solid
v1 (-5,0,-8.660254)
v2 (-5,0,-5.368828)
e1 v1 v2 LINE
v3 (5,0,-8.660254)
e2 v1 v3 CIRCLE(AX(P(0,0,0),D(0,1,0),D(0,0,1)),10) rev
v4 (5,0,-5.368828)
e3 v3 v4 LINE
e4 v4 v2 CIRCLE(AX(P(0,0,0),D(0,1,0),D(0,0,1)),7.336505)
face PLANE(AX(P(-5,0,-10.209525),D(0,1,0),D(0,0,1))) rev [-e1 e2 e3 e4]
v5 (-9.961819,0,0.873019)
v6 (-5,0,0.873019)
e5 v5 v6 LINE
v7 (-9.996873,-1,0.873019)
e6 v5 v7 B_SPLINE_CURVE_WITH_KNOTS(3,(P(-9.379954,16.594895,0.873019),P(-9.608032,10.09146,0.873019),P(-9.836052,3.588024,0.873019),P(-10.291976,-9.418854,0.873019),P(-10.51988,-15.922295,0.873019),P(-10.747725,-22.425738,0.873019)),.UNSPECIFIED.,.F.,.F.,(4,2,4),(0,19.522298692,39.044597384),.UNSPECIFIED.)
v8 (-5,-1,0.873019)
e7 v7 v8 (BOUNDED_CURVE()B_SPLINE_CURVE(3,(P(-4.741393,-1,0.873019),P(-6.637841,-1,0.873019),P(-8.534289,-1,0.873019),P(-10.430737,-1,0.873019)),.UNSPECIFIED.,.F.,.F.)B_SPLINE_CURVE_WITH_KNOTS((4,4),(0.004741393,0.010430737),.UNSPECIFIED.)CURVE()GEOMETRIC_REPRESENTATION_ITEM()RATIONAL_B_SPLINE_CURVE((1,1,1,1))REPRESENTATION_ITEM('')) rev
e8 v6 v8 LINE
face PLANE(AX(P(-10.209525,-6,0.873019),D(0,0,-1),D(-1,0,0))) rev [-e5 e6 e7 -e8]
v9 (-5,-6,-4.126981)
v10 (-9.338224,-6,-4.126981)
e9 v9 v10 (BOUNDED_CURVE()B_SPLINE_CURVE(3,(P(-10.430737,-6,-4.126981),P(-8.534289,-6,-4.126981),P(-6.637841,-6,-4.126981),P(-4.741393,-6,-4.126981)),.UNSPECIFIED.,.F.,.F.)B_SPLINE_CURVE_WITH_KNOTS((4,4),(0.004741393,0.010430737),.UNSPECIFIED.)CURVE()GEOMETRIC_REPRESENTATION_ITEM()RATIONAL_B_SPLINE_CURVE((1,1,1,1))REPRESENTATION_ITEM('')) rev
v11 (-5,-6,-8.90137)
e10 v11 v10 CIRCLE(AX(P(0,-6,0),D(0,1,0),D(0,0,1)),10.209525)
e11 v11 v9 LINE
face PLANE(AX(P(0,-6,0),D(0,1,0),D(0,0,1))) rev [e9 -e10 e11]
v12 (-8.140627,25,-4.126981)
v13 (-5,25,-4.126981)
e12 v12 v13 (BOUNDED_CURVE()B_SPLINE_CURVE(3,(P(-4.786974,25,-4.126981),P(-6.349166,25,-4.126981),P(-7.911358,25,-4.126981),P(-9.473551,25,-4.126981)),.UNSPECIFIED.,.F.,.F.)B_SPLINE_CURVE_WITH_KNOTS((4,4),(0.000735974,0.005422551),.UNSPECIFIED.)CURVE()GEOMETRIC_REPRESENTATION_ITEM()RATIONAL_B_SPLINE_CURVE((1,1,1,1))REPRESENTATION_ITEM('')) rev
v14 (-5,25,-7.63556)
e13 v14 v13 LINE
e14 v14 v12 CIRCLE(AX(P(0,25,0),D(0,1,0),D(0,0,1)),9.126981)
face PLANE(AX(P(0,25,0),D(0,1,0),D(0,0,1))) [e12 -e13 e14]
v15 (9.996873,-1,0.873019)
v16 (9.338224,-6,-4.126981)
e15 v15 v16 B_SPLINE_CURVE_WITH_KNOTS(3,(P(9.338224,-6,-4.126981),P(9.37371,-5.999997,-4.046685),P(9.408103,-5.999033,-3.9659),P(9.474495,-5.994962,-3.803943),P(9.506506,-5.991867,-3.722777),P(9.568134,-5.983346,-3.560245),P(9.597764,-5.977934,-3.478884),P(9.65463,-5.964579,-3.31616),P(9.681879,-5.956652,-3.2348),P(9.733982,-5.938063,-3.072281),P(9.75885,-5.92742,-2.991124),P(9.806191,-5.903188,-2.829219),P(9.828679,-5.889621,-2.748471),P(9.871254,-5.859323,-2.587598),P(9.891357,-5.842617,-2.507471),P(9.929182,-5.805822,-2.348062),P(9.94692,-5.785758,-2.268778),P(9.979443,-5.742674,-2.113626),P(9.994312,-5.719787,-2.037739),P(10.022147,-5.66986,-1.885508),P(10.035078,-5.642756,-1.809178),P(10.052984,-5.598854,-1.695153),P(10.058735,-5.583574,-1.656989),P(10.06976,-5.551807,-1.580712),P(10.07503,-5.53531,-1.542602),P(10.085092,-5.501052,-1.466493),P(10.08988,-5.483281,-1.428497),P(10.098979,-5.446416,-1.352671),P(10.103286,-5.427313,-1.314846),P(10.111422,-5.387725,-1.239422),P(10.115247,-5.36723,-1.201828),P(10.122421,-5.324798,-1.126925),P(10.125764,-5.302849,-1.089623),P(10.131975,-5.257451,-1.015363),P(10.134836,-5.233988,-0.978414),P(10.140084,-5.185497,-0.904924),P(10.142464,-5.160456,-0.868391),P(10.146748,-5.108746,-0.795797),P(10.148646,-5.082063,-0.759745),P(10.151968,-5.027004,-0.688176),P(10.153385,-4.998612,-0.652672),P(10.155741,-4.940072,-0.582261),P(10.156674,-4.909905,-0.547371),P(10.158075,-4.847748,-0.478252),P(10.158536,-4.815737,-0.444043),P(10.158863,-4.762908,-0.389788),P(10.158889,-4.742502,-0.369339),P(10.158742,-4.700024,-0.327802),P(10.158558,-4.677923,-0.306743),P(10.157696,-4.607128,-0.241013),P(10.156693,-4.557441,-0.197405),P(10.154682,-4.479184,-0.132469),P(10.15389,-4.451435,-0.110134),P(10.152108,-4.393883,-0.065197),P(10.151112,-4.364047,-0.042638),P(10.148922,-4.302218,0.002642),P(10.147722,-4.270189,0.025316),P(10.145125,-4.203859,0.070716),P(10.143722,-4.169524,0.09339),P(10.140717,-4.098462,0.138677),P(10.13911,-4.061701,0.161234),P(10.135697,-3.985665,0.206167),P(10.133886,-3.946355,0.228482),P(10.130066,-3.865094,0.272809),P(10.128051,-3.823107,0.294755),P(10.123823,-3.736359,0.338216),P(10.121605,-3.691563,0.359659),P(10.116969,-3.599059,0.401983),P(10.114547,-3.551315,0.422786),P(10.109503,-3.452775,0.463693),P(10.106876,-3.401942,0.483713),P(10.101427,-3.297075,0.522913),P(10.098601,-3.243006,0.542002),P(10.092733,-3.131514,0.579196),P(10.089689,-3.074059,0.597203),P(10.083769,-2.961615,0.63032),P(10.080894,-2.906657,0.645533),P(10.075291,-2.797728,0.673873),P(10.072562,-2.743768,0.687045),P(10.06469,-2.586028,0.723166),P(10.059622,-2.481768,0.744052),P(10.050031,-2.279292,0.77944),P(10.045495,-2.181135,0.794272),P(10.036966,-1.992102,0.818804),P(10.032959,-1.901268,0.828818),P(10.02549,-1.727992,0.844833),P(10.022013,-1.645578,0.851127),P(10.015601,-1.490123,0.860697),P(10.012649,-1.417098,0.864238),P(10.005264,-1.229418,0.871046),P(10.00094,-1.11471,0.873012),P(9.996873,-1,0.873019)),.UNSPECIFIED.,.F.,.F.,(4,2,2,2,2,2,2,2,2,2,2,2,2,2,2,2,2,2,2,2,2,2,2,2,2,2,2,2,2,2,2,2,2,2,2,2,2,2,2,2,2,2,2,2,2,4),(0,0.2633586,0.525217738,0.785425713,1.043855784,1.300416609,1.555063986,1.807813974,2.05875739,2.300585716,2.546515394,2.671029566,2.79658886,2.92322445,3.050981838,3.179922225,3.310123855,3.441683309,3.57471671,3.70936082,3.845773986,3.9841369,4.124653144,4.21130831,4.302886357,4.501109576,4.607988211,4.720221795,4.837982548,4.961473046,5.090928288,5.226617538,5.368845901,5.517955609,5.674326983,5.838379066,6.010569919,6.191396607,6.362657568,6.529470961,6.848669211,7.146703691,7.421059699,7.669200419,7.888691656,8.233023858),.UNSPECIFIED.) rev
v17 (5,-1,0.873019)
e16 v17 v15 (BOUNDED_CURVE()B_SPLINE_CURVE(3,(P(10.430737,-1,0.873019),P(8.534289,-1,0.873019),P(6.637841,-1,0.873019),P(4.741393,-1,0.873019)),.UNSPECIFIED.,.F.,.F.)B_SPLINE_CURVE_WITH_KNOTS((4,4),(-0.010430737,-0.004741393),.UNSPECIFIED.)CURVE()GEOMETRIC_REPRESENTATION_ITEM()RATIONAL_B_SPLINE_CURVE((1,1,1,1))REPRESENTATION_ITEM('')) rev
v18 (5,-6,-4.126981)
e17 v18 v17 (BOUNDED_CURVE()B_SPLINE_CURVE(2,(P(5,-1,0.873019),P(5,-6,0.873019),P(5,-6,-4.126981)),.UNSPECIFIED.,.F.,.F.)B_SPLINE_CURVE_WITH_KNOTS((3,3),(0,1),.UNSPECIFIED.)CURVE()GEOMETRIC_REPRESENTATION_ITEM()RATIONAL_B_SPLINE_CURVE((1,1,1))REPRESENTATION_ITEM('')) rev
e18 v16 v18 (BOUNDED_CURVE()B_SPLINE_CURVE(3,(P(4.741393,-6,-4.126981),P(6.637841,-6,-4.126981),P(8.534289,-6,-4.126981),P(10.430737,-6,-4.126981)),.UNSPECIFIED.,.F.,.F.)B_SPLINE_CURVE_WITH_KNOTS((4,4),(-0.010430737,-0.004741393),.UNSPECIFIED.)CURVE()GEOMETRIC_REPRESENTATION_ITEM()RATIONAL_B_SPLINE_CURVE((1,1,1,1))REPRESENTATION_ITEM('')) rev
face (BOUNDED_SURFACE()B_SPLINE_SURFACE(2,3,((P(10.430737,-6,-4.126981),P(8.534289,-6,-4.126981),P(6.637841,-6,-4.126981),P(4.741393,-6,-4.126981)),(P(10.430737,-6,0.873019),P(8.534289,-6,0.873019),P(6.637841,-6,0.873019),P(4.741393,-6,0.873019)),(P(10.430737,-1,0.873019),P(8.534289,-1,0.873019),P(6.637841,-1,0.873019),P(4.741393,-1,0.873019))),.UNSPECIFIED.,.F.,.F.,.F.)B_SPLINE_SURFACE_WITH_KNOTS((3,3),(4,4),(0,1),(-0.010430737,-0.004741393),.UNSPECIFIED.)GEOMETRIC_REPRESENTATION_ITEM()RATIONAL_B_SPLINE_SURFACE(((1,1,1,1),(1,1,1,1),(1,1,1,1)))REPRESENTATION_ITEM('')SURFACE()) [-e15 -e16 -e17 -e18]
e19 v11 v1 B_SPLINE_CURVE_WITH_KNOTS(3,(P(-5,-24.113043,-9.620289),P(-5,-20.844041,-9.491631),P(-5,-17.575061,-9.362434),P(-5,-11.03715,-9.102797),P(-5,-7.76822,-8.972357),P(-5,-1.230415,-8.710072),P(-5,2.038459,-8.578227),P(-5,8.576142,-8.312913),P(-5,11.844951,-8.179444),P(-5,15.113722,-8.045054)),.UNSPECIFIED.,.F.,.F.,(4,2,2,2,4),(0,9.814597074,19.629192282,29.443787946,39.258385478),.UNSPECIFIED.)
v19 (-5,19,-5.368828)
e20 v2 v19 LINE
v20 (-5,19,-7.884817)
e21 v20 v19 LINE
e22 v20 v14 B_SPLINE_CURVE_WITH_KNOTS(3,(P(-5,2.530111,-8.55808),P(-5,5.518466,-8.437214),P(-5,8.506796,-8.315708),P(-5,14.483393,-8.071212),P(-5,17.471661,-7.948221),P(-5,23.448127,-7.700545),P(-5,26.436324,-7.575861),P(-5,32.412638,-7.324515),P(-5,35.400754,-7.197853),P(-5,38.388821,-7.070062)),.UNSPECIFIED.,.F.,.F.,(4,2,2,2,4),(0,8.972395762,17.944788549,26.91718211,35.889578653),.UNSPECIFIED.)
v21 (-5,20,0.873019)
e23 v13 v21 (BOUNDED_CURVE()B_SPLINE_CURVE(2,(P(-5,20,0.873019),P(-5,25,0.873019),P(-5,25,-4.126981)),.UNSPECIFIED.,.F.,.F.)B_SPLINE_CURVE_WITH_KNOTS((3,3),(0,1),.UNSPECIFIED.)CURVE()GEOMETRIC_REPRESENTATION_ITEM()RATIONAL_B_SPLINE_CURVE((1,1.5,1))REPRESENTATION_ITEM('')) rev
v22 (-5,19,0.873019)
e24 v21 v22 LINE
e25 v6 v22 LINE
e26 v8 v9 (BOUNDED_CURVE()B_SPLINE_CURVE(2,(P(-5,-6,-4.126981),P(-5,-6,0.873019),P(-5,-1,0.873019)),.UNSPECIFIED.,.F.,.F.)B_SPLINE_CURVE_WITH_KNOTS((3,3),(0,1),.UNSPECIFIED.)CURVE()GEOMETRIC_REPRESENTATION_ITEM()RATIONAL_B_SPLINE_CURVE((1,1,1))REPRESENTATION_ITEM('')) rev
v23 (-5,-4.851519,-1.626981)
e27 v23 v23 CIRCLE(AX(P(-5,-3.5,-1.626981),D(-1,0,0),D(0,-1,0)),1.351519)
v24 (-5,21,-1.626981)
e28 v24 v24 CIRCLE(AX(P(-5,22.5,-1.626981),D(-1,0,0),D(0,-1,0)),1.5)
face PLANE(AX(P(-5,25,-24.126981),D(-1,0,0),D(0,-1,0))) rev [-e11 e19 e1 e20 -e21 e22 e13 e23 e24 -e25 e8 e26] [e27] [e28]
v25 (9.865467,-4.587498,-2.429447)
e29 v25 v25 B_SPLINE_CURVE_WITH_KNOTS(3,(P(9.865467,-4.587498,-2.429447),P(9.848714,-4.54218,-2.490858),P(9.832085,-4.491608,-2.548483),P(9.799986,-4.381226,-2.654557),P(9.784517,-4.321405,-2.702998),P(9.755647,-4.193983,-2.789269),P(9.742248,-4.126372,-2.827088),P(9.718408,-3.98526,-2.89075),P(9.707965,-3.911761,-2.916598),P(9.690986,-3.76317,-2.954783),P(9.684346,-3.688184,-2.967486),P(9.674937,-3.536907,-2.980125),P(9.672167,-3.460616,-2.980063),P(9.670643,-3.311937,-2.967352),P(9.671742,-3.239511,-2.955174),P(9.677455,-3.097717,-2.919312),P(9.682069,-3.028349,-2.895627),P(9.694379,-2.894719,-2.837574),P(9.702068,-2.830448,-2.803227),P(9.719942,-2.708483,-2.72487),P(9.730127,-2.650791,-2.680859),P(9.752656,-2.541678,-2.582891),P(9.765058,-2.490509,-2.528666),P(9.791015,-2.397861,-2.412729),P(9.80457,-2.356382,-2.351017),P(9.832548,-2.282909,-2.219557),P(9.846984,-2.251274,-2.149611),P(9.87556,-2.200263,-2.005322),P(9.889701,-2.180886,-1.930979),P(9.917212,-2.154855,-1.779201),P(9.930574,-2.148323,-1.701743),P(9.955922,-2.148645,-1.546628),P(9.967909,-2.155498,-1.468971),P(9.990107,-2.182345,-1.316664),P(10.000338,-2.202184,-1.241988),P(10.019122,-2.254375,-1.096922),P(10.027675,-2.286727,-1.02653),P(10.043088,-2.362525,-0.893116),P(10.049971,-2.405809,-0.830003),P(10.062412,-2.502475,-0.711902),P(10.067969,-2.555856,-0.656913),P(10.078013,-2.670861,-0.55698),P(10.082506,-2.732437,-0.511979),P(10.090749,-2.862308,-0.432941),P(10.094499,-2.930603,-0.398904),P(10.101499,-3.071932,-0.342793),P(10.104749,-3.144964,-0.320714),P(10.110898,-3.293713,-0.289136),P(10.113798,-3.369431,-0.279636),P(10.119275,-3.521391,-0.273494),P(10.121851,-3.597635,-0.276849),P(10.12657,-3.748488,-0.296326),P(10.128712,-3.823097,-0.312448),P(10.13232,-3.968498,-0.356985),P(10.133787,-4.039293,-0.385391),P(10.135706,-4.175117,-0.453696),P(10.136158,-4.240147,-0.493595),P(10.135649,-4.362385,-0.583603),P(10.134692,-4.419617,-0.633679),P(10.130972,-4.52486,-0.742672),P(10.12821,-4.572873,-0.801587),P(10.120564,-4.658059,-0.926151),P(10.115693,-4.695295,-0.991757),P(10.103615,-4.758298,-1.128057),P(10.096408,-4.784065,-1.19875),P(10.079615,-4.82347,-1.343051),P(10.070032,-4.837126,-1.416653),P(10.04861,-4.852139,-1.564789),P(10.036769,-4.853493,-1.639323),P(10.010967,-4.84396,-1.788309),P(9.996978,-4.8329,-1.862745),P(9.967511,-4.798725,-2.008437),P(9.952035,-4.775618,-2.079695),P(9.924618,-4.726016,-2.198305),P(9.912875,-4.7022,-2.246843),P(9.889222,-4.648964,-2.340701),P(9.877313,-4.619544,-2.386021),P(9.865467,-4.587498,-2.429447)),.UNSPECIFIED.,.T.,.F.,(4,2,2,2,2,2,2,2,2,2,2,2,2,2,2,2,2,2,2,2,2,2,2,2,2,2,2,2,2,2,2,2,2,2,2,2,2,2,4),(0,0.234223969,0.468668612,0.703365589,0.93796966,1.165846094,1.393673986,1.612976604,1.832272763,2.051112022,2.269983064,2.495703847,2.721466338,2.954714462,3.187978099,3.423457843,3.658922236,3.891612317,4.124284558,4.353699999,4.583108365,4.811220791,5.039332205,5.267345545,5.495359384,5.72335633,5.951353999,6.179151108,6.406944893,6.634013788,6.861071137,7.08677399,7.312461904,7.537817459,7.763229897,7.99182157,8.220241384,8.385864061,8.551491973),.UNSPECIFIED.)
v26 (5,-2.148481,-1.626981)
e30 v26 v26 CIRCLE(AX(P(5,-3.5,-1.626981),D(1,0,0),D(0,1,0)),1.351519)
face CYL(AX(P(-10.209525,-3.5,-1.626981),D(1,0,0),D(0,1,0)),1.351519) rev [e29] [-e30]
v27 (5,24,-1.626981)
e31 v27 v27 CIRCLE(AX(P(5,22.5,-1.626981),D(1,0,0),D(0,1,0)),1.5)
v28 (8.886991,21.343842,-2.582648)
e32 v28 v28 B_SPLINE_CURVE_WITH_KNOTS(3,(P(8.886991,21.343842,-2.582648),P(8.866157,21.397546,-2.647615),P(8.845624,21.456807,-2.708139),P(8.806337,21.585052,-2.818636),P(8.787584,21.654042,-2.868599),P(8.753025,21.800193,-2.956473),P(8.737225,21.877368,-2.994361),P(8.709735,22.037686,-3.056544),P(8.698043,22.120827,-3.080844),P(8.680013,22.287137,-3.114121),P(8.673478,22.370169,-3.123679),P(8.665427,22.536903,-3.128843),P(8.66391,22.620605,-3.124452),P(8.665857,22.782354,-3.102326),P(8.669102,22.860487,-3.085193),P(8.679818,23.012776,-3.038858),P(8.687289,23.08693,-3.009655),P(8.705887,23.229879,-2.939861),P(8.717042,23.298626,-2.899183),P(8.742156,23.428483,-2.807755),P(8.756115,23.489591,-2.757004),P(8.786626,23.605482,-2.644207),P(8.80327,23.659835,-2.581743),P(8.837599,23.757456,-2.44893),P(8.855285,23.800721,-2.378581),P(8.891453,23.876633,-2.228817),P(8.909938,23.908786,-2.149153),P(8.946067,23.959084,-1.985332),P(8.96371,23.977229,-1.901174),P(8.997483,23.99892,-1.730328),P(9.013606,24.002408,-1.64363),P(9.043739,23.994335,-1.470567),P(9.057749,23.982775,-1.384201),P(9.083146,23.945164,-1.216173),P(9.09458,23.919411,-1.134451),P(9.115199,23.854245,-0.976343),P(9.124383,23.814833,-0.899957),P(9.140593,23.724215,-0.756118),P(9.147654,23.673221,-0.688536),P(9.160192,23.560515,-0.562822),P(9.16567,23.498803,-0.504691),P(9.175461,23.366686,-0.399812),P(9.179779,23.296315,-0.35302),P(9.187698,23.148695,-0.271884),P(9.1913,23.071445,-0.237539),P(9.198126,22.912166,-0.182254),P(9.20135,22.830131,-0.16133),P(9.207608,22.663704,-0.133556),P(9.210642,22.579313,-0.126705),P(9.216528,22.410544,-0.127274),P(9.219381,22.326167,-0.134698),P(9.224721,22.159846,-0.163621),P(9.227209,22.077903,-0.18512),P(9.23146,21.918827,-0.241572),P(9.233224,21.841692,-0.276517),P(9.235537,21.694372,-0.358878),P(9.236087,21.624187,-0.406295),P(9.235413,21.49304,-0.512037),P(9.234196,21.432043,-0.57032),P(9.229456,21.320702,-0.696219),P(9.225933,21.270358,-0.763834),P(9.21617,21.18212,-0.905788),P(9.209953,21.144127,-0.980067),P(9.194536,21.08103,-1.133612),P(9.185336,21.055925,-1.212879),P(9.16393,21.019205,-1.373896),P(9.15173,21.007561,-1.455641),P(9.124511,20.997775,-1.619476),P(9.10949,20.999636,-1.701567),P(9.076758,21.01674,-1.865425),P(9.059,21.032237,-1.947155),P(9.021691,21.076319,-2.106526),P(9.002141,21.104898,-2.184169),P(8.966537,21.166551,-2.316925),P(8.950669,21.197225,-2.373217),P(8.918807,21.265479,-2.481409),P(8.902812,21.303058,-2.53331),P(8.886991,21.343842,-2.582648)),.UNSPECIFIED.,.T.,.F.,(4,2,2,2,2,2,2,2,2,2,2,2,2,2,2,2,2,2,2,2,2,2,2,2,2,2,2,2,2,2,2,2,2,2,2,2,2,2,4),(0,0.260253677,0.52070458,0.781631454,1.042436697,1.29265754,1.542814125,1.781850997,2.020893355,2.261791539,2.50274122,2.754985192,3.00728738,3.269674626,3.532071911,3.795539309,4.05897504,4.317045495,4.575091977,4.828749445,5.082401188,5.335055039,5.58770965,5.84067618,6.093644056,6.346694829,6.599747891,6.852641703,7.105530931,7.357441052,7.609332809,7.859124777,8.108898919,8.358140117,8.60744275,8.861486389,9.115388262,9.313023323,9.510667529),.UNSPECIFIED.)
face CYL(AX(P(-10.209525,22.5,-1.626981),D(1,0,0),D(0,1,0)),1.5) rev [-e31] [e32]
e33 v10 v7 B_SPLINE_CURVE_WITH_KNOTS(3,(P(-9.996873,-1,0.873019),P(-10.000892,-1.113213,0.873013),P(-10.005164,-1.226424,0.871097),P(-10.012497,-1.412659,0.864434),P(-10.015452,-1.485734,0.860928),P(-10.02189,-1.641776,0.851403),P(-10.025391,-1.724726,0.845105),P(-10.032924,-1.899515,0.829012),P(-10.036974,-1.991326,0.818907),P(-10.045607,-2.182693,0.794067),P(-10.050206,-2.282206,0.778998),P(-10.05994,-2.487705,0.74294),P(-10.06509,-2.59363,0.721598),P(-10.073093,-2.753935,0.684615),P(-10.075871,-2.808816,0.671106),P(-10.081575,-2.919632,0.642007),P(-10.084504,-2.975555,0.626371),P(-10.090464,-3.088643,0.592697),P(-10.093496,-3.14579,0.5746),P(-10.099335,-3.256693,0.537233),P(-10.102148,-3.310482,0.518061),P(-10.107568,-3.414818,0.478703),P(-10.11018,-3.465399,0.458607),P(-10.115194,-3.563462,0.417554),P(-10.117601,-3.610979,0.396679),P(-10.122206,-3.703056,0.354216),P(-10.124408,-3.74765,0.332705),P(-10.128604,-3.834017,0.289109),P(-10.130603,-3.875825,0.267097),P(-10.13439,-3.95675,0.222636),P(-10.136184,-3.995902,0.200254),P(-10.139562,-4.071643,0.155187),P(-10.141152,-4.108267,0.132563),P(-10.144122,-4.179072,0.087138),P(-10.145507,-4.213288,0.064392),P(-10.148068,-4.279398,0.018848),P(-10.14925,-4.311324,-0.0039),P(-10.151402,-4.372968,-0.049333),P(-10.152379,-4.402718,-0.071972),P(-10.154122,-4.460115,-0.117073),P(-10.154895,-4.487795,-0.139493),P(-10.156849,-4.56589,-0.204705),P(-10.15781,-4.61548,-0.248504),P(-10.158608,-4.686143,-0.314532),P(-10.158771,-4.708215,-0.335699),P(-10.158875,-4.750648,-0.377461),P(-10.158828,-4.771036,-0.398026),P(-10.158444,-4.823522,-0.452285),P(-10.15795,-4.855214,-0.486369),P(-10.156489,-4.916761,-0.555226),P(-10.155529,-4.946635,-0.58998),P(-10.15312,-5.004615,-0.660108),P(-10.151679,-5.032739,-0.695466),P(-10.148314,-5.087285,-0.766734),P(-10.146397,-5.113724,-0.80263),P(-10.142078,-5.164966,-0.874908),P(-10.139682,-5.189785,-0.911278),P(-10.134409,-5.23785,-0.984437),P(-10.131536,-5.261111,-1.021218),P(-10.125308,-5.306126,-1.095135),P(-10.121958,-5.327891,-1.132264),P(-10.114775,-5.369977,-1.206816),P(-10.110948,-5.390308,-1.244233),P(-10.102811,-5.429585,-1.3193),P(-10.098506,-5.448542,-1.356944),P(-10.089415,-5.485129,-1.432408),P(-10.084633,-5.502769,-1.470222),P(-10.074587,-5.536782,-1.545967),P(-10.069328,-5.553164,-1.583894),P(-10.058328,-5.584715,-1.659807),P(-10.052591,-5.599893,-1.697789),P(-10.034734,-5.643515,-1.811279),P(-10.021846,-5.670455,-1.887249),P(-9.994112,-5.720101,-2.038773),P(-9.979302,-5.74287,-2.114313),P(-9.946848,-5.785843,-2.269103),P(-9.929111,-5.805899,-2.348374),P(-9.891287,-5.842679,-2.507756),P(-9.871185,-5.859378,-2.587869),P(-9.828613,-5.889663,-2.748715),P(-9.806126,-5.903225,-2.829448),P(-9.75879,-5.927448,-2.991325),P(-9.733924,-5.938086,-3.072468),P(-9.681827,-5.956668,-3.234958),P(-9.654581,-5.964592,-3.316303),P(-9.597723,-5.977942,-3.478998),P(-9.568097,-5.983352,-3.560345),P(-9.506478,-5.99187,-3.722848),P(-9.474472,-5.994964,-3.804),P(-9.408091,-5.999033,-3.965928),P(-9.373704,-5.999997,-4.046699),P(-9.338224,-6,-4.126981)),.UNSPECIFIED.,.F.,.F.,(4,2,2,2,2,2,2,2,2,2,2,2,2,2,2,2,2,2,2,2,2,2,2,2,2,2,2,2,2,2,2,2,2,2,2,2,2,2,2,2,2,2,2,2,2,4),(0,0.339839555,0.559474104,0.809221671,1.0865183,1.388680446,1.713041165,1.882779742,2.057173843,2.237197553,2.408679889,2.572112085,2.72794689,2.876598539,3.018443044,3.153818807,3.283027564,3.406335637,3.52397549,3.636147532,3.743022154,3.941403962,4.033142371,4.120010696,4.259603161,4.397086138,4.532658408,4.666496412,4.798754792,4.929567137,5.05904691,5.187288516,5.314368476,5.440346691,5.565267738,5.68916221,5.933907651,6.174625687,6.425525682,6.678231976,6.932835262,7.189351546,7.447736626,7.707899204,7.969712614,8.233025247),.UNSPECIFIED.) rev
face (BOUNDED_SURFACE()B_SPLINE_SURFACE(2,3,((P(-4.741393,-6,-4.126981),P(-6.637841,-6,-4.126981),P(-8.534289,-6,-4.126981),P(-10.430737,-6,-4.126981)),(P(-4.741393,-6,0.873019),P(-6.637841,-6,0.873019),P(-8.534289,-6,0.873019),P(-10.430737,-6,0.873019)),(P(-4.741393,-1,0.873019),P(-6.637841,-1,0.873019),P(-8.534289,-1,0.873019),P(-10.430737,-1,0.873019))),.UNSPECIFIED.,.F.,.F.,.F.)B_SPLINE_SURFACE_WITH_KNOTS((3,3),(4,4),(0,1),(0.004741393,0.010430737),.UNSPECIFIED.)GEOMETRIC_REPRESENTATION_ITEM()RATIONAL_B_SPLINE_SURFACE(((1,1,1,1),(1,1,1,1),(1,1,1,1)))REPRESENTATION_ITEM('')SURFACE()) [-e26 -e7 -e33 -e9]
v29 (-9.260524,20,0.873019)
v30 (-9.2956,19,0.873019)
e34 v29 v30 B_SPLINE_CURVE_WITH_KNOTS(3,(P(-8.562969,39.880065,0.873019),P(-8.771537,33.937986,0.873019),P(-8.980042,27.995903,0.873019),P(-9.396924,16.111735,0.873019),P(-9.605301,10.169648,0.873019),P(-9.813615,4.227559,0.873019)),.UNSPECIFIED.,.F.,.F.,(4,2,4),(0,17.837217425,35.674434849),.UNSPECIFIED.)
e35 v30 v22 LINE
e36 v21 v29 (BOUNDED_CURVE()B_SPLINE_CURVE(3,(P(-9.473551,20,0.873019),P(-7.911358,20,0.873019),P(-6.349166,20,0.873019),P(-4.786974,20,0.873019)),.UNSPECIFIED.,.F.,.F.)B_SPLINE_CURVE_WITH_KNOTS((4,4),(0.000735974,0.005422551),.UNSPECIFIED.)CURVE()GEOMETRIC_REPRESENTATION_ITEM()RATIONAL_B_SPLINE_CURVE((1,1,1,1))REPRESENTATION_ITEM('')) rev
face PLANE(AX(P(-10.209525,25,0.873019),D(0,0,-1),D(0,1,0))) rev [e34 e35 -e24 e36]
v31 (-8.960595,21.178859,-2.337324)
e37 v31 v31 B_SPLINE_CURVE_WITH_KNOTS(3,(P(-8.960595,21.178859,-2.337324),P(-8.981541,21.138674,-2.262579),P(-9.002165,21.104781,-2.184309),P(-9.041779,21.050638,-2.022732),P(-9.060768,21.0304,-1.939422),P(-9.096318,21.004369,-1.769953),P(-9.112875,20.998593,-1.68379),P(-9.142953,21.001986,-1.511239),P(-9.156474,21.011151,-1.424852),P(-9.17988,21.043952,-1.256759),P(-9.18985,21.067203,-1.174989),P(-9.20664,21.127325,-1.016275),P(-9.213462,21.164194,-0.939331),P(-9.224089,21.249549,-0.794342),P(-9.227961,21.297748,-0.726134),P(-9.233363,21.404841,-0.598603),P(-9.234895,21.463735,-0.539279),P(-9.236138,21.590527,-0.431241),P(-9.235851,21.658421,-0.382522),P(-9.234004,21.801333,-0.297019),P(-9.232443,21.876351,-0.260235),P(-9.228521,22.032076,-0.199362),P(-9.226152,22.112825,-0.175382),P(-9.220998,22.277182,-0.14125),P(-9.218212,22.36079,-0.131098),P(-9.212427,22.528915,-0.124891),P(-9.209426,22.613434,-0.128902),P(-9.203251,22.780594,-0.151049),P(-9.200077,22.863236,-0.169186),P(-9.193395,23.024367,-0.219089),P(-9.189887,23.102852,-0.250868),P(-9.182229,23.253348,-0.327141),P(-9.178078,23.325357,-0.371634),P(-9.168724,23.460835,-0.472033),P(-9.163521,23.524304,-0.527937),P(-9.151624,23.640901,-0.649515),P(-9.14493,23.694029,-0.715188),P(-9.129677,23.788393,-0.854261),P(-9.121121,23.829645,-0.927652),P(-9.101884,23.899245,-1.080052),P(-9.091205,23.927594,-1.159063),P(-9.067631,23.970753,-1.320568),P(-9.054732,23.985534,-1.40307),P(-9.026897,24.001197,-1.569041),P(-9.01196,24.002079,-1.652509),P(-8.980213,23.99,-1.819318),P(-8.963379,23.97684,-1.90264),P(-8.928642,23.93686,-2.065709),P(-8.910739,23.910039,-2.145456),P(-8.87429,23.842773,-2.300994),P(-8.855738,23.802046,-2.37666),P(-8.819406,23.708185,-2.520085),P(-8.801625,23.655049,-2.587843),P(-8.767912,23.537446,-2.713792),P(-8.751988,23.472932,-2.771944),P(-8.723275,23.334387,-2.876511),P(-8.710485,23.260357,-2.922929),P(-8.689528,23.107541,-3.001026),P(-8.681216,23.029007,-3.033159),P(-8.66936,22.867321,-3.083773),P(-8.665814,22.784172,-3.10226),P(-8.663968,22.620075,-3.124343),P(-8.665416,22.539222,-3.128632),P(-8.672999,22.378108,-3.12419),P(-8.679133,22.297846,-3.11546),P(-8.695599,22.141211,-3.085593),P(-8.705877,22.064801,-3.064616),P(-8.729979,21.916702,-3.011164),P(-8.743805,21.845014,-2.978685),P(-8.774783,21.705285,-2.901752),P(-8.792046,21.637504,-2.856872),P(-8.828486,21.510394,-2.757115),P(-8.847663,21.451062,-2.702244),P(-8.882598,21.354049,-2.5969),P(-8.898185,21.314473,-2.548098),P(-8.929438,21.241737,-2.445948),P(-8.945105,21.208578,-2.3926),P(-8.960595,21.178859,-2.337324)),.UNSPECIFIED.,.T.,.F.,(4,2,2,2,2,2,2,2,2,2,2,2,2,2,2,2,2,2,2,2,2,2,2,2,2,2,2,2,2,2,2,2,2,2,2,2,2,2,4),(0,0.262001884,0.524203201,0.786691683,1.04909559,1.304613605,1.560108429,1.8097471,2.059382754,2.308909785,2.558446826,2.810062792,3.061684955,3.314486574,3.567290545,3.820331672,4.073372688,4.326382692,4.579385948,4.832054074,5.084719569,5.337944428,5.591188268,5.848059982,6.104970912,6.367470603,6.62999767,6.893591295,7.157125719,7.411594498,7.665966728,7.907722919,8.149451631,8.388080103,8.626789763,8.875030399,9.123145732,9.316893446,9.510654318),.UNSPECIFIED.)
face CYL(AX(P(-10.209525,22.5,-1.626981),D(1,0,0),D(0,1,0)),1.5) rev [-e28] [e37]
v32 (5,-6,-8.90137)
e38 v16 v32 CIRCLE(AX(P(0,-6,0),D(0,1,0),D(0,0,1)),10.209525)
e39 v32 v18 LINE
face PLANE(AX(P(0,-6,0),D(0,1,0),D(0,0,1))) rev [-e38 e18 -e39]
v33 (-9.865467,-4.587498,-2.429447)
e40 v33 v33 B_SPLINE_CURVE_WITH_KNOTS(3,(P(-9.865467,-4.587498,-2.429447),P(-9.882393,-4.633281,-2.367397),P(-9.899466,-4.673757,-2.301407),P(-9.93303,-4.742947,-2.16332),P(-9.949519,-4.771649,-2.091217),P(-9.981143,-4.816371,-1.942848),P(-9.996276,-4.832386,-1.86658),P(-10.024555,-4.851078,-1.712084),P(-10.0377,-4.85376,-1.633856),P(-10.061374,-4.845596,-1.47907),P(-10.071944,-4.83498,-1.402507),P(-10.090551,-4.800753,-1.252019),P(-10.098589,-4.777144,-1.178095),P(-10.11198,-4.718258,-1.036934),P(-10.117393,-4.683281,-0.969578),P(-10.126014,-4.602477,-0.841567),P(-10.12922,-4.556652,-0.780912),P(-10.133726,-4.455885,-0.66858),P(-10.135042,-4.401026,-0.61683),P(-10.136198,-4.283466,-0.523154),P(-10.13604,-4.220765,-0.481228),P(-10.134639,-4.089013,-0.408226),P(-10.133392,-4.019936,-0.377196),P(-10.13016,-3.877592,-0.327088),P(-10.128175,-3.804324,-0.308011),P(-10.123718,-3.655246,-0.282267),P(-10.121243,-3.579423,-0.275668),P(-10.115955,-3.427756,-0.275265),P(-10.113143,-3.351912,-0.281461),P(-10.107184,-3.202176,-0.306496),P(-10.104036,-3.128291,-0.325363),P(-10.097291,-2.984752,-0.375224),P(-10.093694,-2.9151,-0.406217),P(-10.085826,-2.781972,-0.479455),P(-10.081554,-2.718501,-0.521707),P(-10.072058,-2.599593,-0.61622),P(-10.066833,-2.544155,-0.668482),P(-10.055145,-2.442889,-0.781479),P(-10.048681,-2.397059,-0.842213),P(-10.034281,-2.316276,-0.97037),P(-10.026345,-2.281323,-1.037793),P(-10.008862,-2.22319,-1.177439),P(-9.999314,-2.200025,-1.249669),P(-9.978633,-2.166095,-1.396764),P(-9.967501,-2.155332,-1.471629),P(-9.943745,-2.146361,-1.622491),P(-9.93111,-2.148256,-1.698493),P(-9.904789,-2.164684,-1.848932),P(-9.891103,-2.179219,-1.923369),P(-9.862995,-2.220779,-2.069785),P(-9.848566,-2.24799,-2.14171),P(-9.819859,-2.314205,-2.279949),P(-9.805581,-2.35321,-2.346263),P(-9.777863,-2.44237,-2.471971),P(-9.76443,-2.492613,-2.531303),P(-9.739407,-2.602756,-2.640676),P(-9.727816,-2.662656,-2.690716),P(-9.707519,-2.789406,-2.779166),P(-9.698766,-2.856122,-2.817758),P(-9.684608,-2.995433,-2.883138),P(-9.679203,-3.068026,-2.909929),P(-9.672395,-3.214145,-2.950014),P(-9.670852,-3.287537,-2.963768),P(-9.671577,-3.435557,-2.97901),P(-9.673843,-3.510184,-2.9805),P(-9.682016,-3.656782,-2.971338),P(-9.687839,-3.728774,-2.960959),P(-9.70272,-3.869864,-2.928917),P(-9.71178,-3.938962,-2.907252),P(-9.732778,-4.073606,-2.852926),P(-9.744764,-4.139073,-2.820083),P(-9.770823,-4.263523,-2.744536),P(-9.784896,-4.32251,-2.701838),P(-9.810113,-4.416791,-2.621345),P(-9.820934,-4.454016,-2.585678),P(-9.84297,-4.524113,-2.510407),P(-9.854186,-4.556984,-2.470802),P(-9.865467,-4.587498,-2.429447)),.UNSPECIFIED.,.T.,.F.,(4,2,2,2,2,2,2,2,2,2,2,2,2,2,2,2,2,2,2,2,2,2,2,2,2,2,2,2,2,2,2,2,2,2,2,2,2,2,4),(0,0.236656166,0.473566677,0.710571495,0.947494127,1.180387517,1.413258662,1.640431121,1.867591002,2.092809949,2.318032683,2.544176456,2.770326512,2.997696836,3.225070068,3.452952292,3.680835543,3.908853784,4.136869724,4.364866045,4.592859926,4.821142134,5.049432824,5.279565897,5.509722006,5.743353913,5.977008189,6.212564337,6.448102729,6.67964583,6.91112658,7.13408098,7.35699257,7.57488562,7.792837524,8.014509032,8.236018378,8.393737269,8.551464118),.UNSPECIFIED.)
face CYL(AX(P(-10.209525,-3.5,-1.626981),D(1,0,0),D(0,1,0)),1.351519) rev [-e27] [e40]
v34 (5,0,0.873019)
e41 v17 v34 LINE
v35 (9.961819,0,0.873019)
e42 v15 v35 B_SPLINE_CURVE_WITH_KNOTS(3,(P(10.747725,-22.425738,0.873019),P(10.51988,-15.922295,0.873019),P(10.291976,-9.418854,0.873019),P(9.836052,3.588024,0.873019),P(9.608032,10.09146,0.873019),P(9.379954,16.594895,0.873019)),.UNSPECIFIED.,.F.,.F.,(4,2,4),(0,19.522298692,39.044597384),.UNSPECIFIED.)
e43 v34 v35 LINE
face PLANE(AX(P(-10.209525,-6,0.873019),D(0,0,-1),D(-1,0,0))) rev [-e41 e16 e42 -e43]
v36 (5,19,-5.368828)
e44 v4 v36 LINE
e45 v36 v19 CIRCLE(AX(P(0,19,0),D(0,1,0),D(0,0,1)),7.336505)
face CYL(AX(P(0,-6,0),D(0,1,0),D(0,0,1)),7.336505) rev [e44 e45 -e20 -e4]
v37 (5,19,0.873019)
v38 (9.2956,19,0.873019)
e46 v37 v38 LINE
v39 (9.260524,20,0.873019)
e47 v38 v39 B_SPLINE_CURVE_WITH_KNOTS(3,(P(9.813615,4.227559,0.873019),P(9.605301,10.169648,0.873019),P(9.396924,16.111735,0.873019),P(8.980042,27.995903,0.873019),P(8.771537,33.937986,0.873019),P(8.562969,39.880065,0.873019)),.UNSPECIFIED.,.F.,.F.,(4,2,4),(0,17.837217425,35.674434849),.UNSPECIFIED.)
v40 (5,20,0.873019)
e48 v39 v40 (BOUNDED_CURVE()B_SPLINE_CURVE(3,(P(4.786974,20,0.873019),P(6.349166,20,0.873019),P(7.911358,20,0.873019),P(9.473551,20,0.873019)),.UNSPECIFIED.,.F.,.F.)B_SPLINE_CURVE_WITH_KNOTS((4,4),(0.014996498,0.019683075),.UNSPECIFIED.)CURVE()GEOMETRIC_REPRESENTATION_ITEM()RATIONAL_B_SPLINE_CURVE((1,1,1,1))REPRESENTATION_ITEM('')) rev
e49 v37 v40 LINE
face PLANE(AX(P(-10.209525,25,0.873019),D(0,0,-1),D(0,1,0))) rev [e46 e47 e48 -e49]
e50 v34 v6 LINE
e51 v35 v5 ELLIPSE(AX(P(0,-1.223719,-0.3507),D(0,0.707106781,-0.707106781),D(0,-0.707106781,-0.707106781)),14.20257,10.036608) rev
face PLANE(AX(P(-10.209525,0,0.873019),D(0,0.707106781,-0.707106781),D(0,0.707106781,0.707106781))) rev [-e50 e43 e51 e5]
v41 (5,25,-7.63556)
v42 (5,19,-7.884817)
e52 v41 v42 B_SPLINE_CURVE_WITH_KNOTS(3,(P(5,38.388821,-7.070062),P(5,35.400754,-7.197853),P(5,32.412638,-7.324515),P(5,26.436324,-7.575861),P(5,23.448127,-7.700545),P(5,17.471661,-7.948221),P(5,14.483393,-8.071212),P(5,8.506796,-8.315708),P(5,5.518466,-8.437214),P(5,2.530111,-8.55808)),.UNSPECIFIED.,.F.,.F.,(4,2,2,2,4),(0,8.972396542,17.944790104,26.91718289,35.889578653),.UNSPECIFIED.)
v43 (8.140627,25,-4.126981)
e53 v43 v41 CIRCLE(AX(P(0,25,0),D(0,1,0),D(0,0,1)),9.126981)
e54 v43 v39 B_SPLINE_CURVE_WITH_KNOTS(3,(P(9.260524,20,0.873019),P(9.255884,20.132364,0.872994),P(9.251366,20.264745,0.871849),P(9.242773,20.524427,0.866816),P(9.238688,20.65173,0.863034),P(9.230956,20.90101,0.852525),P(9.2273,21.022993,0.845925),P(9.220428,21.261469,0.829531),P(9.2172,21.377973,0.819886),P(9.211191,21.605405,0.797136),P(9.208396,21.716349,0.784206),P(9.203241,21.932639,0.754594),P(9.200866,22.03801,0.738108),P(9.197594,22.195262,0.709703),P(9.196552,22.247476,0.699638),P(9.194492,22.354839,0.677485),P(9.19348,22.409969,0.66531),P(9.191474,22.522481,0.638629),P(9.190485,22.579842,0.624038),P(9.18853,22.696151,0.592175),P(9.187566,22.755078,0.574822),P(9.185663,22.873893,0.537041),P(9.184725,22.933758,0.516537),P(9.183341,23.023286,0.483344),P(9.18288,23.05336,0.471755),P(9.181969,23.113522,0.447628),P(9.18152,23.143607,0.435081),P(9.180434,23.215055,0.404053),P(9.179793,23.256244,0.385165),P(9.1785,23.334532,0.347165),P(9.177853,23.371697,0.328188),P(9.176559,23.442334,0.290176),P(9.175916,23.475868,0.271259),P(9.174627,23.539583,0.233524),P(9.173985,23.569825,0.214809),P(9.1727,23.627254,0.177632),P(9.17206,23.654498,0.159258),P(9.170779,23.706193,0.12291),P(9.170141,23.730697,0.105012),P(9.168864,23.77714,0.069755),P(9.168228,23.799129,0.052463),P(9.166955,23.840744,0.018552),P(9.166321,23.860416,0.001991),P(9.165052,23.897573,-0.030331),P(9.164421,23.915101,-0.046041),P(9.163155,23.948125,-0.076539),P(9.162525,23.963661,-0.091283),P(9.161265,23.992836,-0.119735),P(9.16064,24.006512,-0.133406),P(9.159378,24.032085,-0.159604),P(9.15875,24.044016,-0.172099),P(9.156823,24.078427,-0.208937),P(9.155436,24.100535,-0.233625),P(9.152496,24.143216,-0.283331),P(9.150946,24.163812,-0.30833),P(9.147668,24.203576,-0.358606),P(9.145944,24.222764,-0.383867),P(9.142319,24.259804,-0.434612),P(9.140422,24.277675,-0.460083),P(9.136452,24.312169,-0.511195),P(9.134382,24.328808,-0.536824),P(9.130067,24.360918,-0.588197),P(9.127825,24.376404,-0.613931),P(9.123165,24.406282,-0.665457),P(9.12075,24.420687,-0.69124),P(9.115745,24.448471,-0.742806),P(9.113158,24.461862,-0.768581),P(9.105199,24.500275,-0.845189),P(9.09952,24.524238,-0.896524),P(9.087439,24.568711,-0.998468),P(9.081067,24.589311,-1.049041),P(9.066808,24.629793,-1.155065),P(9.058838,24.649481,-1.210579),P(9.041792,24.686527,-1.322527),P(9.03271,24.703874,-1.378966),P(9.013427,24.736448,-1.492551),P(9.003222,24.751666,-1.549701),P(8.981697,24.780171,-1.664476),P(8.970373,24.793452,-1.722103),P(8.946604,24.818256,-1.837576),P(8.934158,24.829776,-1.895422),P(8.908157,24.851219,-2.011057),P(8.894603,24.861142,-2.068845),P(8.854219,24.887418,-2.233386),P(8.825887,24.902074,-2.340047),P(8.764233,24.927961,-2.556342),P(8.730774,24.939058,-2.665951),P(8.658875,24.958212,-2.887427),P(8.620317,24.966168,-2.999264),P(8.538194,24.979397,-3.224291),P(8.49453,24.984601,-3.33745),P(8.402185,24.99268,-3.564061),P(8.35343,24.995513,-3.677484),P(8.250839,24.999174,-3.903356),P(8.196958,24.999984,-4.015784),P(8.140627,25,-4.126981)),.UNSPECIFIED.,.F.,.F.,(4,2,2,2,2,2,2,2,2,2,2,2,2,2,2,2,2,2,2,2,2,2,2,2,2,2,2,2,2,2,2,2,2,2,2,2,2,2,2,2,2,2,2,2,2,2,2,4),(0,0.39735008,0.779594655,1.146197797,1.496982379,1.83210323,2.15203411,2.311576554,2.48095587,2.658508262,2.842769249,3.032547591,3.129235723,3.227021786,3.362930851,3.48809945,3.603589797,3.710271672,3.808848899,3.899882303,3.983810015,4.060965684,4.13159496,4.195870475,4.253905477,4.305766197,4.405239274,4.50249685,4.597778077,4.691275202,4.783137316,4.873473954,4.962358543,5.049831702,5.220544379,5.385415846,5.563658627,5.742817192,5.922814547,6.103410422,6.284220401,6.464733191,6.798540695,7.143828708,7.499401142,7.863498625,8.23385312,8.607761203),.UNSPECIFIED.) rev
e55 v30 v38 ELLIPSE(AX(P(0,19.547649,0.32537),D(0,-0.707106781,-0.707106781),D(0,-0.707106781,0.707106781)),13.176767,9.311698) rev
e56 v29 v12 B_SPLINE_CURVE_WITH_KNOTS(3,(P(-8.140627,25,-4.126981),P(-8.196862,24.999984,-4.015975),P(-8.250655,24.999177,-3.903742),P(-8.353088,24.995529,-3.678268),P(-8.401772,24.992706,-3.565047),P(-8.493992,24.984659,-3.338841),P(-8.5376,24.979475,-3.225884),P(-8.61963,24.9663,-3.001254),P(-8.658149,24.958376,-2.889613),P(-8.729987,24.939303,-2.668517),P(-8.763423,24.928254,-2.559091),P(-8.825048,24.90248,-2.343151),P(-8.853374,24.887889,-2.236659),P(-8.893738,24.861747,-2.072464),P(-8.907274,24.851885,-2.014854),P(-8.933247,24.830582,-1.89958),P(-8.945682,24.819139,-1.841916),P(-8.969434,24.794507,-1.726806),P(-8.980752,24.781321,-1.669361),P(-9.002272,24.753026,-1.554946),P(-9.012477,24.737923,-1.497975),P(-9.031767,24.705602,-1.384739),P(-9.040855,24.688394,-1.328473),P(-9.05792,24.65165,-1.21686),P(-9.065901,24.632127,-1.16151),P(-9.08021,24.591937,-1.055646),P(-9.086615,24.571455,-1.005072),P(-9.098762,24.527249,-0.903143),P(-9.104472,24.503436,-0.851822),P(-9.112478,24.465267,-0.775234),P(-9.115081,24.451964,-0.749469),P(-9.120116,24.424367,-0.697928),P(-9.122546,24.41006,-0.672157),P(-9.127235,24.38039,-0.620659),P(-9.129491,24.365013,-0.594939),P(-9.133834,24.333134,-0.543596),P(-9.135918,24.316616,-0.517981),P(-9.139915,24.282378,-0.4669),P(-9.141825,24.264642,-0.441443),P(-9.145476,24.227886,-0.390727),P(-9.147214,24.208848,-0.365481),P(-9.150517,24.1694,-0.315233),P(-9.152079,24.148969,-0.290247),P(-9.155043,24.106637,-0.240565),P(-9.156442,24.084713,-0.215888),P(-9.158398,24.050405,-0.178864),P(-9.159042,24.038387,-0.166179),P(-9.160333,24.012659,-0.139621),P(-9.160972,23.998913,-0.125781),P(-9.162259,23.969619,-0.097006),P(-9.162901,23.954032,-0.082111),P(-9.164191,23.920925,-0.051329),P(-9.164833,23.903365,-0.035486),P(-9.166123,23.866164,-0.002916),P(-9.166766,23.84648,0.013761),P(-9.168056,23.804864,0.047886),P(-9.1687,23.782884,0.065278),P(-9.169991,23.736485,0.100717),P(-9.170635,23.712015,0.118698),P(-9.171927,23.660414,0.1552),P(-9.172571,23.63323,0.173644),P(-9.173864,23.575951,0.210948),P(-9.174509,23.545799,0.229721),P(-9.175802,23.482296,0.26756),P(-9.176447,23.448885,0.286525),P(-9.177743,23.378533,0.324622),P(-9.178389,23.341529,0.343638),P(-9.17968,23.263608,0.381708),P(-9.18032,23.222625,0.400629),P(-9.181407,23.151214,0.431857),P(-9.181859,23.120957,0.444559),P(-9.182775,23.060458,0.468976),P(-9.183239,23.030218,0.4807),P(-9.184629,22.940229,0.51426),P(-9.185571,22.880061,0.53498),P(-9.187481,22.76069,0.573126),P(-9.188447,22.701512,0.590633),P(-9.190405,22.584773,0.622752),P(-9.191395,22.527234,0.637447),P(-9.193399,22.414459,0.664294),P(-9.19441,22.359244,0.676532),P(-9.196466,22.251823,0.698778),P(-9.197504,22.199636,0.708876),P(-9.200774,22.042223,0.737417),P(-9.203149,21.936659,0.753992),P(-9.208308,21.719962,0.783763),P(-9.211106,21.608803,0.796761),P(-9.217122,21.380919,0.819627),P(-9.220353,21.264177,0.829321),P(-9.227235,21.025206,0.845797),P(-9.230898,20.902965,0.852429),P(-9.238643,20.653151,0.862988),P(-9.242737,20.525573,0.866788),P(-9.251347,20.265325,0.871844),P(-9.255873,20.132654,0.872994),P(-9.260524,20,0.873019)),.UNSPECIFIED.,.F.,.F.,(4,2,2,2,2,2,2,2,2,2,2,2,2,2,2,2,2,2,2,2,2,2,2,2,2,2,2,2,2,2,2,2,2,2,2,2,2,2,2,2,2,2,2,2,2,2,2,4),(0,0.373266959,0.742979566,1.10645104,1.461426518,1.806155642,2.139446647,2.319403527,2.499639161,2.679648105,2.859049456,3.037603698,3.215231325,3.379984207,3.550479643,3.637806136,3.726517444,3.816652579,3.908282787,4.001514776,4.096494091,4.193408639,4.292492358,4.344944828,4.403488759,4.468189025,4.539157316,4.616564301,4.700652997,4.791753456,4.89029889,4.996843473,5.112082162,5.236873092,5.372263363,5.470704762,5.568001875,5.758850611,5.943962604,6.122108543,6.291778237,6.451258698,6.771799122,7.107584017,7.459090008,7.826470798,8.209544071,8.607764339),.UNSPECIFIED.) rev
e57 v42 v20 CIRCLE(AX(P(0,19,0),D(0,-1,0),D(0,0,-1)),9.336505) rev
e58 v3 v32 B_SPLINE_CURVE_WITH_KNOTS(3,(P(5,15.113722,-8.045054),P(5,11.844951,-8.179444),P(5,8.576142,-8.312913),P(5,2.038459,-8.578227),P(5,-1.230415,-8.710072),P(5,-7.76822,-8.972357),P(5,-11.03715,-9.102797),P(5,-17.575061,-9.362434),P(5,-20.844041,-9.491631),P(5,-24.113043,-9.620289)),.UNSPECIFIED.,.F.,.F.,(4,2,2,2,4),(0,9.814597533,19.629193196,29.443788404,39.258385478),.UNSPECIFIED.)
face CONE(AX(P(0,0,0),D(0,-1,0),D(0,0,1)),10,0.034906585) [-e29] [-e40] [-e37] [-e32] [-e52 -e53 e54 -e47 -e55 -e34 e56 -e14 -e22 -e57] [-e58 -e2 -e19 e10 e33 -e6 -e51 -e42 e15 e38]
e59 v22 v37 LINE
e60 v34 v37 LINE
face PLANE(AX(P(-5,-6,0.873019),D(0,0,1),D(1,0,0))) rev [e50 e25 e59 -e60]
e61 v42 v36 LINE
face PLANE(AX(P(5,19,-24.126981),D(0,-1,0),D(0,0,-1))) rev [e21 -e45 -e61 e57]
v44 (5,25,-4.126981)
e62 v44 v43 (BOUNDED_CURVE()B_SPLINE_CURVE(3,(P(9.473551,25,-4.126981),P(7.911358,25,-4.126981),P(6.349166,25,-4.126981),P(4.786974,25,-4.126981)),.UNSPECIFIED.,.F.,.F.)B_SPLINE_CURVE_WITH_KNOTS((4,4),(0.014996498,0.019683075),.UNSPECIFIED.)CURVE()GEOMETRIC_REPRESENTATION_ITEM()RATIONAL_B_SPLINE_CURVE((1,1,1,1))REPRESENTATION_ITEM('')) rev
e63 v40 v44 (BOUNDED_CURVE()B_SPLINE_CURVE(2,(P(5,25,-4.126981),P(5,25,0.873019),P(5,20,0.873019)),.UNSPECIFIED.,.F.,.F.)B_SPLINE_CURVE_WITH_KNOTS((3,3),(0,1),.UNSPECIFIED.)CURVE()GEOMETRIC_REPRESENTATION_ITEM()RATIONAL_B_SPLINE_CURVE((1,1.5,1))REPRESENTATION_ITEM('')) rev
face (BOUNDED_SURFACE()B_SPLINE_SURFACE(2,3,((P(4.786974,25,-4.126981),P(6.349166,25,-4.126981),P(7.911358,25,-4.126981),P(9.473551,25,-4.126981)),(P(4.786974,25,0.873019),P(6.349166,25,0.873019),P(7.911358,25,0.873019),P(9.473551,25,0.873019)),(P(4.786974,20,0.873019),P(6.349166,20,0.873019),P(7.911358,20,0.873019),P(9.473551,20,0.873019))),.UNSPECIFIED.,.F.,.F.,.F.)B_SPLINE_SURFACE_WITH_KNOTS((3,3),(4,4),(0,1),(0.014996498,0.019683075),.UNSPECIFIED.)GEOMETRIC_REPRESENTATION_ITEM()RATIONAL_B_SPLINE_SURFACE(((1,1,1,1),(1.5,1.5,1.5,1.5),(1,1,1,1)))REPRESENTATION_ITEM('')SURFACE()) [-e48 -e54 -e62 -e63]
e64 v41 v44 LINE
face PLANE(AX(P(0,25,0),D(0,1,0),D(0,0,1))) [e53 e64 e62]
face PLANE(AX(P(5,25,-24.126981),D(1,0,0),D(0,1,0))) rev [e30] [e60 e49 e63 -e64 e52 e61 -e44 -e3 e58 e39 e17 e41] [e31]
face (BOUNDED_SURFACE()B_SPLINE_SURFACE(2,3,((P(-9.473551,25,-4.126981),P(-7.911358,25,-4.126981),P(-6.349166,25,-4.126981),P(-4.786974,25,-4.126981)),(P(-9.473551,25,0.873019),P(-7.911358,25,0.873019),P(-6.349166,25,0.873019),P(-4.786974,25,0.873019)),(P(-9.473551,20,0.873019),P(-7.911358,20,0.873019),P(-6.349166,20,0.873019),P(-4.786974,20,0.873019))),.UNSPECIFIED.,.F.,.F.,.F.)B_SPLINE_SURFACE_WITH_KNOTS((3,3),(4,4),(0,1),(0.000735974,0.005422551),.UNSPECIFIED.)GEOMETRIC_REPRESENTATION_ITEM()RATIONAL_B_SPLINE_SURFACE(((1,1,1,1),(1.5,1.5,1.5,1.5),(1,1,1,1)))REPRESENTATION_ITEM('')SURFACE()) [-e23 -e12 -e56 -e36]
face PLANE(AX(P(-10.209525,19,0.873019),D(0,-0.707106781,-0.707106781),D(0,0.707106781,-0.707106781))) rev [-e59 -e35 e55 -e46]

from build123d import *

# Parameters (mm, degrees)
SKETCH1_R                     = 10
BOSS_EXTRUDE1_DEPTH           = 25
BOSS_EXTRUDE1_TAPER           = 2
BOSS_EXTRUDE1_OTHER_WAY_DEPTH = 6
BOSS_EXTRUDE1_OTHER_WAY_TAPER = -2
CUT_EXTRUDE1_DEPTH            = 29.86985947
CUT_EXTRUDE1_DEPTH_BACK       = 29.86985947
SKETCH3_W                     = 10
SKETCH3_H                     = 6
CUT_EXTRUDE2_DEPTH            = 25
CUT_EXTRUDE3_DEPTH            = 31.99296746
CUT_EXTRUDE3_DEPTH_BACK       = 31.99296746
SKETCH4_R                     = 1.5
FILLET2_SIZE                  = 5
CUT_EXTRUDE5_DEPTH            = 29.869859627
CUT_EXTRUDE5_DEPTH_BACK       = 29.869859627
SKETCH8_W                     = 10
SKETCH8_H                     = 6
CUT_EXTRUDE6_DEPTH            = 30.190018507
CUT_EXTRUDE7_DEPTH            = 29.796430368
CUT_EXTRUDE8_DEPTH            = 31.924580015
CUT_EXTRUDE8_DEPTH_BACK       = 31.924580015
SKETCH9_R                     = 1.351518808
FILLET3_SIZE                  = 5


with BuildPart() as part:
    # Sketch1 → Boss-Extrude1 (new body)
    with BuildSketch(Plane(origin=(0, 0, 0), x_dir=(1, 0, 0), z_dir=(0, 1, 0))):
        Circle(SKETCH1_R)
    extrude(amount=BOSS_EXTRUDE1_DEPTH, taper=BOSS_EXTRUDE1_TAPER)

    # Sketch1 → Boss-Extrude1 other way (add)
    with BuildSketch(Plane(origin=(0, 0, 0), x_dir=(1, 0, 0), z_dir=(0, 1, 0))):
        Circle(SKETCH1_R)
    extrude(amount=-BOSS_EXTRUDE1_OTHER_WAY_DEPTH, taper=BOSS_EXTRUDE1_OTHER_WAY_TAPER)

    # Sketch2 → Cut-Extrude1 (cut, two sides: drawn at the far end of the back side and taken through both)
    with BuildSketch(Plane(origin=(0, 0, 0), x_dir=(0, 0, -1), z_dir=(1, 0, 0)).offset(-CUT_EXTRUDE1_DEPTH_BACK)):
        Polygon((-0.873019237, 25), (-0.873019237, 19), (-12.898136563, 6.974882674), (-12.898136563, 25), align=None)
    extrude(amount=CUT_EXTRUDE1_DEPTH + CUT_EXTRUDE1_DEPTH_BACK, mode=Mode.SUBTRACT)

    # Sketch3 → Cut-Extrude2 (cut)
    with BuildSketch(Plane.XY.offset(0.873019237)):
        with Locations((0, 22)):
            Rectangle(SKETCH3_W, SKETCH3_H)
    extrude(amount=-CUT_EXTRUDE2_DEPTH, mode=Mode.SUBTRACT)

    # Sketch4 → Cut-Extrude3 (cut, two sides: drawn at the far end of the back side and taken through both)
    with BuildSketch(Plane(origin=(-5, 0, 0), x_dir=(0, 0, -1), z_dir=(1, 0, 0)).offset(-CUT_EXTRUDE3_DEPTH_BACK)):
        with Locations(Location((1.626980763, 22.5, 0), (0, 0, 90))):
            Circle(SKETCH4_R)
    extrude(amount=CUT_EXTRUDE3_DEPTH + CUT_EXTRUDE3_DEPTH_BACK, mode=Mode.SUBTRACT)

    # Fillet2
    # a fillet whose section is not a circle: 5 mm, written as the material it takes off along each edge
    with BuildSketch(Plane(origin=(-7.5, 25, 0.873019237), x_dir=(0, -1, 0), z_dir=(1, 0, 0))) as fillet2_piece_1:
        with BuildLine():
            Bezier((FILLET2_SIZE, 0), (0, 0), (0, FILLET2_SIZE), weights=[1, 1.5, 1])
            Line((0, FILLET2_SIZE), (0, 0))
            Line((0, 0), (FILLET2_SIZE, 0))
        make_face()
    extrude(amount=29.085131549, mode=Mode.SUBTRACT)
    with BuildSketch(Plane(origin=(-21.585131549, 25, 0.873019237), x_dir=(0, 0, -1), z_dir=(1, 0, 0))) as fillet2_piece_2:
        with BuildLine():
            Bezier((FILLET2_SIZE, 0), (0, 0), (0, -FILLET2_SIZE), weights=[1, 1.5, 1])
            Line((0, -FILLET2_SIZE), (0, 0))
            Line((0, 0), (FILLET2_SIZE, 0))
        make_face()
    extrude(amount=29.085131549, mode=Mode.SUBTRACT)

    # Sketch7 → Cut-Extrude5 (cut, two sides: drawn at the far end of the back side and taken through both)
    with BuildSketch(Plane(origin=(0, 0, 0), x_dir=(0, 0, -1), z_dir=(1, 0, 0)).offset(-CUT_EXTRUDE5_DEPTH_BACK)):
        Polygon((-0.873019237, -6), (-0.873019237, 0), (-11.31781305, 10.444793812), (-11.31781305, -6), align=None)
    extrude(amount=CUT_EXTRUDE5_DEPTH + CUT_EXTRUDE5_DEPTH_BACK, mode=Mode.SUBTRACT)

    # Sketch8 → Cut-Extrude6 (cut, through all)
    with BuildSketch(Plane.XY.offset(0.873019237)):
        with Locations((0, -3)):
            Rectangle(SKETCH8_W, SKETCH8_H)
    extrude(amount=-CUT_EXTRUDE6_DEPTH, mode=Mode.SUBTRACT)

    # Sketch6 → Cut-Extrude7 (cut, through all)
    with BuildSketch(Plane(origin=(0, 19, 0), x_dir=(1, 0, 0), z_dir=(0, 1, 0))):
        with BuildLine():
            Line((5, 5.368827729), (5, -0.873019237))
            Line((5, -0.873019237), (-5, -0.873019237))
            Line((-5, -0.873019237), (-5, 5.368827729))
            ThreePointArc((-5, 5.368827729), (0, 7.33650538), (5, 5.368827729))
        make_face()
    extrude(amount=-CUT_EXTRUDE7_DEPTH, mode=Mode.SUBTRACT)

    # Sketch9 → Cut-Extrude8 (cut, two sides: drawn at the far end of the back side and taken through both)
    with BuildSketch(Plane(origin=(-5, 0, 0), x_dir=(0, 0, -1), z_dir=(1, 0, 0)).offset(-CUT_EXTRUDE8_DEPTH_BACK)):
        with Locations(Location((1.626980763, -3.5, 0), (0, 0, 90))):
            Circle(SKETCH9_R)
    extrude(amount=CUT_EXTRUDE8_DEPTH + CUT_EXTRUDE8_DEPTH_BACK, mode=Mode.SUBTRACT)

    # Fillet3
    # a fillet whose section is not a circle: 5 mm, written as the material it takes off along each edge
    with BuildSketch(Plane(origin=(22.672130078, -6, 0.873019237), x_dir=(0, 0, -1), z_dir=(-1, 0, 0))) as fillet3_piece_1:
        with BuildLine():
            Bezier((FILLET3_SIZE, 0), (0, 0), (0, -FILLET3_SIZE), weights=[1, 1, 1])
            Line((0, -FILLET3_SIZE), (0, 0))
            Line((0, 0), (FILLET3_SIZE, 0))
        make_face()
    extrude(amount=30.172130078, mode=Mode.SUBTRACT)
    with BuildSketch(Plane(origin=(7.5, -6, 0.873019237), x_dir=(0, 1, 0), z_dir=(-1, 0, 0))) as fillet3_piece_2:
        with BuildLine():
            Bezier((FILLET3_SIZE, 0), (0, 0), (0, FILLET3_SIZE), weights=[1, 1, 1])
            Line((0, FILLET3_SIZE), (0, 0))
            Line((0, 0), (FILLET3_SIZE, 0))
        make_face()
    extrude(amount=30.172130078, mode=Mode.SUBTRACT)


solid = part.part
